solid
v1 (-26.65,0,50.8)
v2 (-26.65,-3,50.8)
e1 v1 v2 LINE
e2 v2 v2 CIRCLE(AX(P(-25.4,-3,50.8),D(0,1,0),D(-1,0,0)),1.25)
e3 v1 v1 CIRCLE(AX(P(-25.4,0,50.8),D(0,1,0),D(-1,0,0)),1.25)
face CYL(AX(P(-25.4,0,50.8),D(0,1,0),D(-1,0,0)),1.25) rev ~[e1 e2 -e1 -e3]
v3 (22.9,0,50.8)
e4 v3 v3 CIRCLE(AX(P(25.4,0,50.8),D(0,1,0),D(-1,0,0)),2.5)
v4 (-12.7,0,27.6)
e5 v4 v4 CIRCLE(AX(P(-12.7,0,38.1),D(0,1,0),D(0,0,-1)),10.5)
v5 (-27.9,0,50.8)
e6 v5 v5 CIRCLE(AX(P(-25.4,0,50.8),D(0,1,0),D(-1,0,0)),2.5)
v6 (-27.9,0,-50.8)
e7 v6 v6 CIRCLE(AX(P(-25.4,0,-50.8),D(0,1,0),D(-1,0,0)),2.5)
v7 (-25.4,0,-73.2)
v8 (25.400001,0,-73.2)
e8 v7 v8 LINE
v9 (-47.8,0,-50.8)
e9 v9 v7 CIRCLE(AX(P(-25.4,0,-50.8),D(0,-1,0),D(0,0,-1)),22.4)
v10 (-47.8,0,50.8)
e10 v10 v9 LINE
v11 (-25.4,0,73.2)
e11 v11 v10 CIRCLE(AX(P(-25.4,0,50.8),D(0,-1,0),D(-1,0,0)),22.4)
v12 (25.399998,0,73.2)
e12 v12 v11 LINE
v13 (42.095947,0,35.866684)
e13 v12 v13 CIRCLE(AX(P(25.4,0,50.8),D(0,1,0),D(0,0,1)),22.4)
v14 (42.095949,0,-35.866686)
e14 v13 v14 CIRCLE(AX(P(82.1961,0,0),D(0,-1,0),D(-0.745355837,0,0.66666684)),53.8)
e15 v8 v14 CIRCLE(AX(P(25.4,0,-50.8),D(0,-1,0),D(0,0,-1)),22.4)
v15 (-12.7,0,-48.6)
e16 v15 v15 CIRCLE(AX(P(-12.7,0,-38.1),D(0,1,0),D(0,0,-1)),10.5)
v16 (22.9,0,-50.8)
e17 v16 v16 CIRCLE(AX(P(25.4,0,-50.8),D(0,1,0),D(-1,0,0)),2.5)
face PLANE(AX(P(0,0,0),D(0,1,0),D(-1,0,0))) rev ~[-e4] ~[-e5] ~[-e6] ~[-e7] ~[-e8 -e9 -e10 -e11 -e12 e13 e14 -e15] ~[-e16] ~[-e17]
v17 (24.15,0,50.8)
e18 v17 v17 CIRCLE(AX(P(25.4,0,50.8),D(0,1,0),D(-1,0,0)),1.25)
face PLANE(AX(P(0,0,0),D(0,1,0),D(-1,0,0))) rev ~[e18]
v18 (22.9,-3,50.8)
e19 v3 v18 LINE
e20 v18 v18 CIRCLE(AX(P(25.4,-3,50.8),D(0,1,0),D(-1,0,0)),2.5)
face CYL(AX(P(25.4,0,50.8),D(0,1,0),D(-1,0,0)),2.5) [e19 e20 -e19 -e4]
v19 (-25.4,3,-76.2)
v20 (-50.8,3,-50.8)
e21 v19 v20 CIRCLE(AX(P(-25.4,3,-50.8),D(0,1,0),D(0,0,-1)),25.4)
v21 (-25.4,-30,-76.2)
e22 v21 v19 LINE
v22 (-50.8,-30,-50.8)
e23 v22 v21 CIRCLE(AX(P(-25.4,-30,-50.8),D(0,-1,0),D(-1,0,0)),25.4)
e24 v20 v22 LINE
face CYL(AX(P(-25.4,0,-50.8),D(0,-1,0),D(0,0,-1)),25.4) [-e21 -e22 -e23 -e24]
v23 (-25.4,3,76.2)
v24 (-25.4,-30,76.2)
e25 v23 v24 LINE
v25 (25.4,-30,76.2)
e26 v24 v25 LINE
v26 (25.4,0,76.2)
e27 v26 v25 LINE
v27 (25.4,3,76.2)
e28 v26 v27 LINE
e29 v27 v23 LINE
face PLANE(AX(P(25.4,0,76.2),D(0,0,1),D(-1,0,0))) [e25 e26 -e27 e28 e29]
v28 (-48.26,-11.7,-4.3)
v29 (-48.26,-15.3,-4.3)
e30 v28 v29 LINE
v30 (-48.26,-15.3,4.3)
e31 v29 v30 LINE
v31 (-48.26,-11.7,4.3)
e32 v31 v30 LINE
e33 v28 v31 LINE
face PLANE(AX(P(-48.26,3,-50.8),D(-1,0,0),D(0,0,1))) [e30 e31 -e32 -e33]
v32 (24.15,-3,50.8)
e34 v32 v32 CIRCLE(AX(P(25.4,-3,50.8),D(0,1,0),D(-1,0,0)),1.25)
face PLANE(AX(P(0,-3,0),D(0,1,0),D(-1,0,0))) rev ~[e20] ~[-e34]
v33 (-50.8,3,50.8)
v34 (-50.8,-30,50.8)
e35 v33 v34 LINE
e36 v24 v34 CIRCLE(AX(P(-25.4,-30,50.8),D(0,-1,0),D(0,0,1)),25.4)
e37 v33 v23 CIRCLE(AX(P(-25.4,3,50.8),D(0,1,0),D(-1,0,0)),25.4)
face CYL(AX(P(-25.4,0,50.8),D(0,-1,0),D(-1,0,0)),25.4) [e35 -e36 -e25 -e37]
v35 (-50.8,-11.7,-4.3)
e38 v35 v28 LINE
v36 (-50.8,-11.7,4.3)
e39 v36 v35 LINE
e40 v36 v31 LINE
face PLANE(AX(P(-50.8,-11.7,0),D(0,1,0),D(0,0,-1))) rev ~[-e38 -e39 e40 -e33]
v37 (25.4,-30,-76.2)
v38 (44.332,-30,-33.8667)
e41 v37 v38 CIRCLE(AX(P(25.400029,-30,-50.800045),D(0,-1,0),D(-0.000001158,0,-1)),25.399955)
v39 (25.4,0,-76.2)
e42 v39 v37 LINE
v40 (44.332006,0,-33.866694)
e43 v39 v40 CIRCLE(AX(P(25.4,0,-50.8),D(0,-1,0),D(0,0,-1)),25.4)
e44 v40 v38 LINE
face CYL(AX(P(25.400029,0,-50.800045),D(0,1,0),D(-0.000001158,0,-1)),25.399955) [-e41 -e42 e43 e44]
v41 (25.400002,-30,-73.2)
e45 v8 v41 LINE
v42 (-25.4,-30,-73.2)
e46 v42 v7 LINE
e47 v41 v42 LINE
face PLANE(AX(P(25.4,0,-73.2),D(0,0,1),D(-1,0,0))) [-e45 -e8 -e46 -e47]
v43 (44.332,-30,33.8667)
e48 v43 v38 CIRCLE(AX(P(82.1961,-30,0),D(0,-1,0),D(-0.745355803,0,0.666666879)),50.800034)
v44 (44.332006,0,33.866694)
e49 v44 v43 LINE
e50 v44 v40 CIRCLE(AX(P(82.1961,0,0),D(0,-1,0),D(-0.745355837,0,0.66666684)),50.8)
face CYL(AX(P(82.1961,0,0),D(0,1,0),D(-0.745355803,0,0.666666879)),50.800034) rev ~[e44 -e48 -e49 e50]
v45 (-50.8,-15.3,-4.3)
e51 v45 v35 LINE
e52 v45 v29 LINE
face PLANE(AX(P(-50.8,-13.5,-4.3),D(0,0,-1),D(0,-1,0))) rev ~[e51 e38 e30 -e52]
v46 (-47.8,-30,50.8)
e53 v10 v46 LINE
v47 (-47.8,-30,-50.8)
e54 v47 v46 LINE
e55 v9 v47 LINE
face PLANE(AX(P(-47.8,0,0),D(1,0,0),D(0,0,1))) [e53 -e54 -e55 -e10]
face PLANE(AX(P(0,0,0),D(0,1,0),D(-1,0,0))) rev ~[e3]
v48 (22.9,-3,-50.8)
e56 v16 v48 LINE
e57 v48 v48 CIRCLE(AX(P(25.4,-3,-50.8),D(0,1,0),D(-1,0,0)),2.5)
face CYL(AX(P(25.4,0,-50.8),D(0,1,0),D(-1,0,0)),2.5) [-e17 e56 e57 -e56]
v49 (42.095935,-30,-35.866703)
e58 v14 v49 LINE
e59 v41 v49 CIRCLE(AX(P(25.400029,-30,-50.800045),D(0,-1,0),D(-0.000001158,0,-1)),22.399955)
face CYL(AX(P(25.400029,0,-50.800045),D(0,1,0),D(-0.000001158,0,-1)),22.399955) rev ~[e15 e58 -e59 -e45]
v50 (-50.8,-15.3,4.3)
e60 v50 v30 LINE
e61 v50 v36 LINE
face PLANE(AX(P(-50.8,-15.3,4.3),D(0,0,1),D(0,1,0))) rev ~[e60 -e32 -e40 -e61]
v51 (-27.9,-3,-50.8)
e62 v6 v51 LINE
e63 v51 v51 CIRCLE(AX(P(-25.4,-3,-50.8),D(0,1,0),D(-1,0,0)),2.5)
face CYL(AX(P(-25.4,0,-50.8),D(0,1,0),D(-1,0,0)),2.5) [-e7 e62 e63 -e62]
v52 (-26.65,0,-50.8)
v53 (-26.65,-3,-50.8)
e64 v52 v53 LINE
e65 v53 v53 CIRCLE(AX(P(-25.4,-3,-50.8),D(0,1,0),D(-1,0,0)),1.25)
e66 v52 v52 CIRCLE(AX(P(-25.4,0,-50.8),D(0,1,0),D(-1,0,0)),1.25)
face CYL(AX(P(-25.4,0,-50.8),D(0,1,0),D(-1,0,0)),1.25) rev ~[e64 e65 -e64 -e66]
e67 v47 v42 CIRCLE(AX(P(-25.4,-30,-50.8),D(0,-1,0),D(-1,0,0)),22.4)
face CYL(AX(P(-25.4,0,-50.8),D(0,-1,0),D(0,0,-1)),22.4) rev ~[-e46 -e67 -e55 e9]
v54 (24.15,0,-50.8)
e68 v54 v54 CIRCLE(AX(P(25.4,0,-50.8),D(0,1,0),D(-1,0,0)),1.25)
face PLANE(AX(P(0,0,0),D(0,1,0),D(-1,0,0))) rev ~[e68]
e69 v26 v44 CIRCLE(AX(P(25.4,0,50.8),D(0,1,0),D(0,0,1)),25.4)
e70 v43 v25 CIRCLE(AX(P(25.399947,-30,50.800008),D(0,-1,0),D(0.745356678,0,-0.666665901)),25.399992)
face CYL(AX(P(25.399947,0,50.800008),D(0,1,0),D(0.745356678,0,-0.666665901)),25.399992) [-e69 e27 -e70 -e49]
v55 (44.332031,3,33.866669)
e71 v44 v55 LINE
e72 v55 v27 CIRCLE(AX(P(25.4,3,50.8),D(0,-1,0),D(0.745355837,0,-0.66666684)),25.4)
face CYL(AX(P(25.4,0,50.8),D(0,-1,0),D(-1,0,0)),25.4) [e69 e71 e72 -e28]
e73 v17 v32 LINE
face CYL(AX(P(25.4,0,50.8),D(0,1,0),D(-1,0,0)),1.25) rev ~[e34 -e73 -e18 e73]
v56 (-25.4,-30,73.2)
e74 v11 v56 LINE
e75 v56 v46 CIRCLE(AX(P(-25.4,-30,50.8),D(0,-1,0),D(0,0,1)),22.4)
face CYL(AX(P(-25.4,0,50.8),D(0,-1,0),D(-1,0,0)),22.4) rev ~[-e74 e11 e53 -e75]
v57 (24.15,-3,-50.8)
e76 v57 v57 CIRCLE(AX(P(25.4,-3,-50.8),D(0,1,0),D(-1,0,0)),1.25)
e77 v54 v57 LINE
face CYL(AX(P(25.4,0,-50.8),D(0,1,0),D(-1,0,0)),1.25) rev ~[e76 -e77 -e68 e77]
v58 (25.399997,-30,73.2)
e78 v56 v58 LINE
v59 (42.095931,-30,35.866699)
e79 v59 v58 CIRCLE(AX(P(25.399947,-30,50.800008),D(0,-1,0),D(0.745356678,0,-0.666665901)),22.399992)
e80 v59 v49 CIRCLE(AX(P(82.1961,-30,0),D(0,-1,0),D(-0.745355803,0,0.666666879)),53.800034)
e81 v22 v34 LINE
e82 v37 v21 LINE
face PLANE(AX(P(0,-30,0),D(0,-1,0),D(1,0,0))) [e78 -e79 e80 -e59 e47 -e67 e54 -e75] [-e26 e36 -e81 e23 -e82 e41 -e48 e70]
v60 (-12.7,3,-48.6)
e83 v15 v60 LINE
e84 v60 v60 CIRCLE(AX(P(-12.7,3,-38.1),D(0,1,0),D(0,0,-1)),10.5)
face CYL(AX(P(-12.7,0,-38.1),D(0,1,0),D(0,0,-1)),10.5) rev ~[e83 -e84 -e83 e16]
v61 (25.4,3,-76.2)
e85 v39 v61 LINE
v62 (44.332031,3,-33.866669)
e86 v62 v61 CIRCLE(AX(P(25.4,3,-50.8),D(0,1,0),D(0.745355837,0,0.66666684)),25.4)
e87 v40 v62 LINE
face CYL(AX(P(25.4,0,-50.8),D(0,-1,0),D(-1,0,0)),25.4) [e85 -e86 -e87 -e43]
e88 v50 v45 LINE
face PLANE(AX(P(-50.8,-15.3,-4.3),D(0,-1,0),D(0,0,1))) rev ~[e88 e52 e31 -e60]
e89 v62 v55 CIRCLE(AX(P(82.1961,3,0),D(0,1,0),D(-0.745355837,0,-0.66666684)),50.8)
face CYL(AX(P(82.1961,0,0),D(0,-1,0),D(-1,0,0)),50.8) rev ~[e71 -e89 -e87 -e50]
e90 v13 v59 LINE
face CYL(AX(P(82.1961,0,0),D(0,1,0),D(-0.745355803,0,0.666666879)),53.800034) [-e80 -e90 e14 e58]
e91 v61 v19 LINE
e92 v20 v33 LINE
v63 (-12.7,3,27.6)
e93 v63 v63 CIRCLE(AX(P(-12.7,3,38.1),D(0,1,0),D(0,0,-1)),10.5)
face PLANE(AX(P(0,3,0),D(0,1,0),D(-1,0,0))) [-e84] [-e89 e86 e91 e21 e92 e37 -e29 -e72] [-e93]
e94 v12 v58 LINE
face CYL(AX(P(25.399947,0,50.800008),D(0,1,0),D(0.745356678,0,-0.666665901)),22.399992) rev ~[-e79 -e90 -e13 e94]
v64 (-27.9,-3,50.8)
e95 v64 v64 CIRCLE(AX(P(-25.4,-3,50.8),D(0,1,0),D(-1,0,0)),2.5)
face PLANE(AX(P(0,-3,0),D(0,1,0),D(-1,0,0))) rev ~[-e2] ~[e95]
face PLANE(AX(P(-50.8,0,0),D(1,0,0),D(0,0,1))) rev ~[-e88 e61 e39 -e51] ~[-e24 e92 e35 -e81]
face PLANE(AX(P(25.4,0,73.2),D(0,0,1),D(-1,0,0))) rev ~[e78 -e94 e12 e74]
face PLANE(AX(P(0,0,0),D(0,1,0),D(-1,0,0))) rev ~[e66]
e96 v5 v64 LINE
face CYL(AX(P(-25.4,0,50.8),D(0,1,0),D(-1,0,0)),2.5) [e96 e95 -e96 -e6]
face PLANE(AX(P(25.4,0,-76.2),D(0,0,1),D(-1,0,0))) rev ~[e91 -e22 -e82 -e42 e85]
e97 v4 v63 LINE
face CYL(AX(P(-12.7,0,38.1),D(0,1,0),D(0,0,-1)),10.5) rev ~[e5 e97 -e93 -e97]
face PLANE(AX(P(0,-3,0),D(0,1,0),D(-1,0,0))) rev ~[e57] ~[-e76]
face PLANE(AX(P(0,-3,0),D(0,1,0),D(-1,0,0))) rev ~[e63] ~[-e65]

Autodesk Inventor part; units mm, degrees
ref_plane "YZ Plane" through (0, 0, 0) normal (1, 0, 0) x (0, 1, 0)
ref_plane "XZ Plane" through (0, 0, 0) normal (0, 1, 0) x (-1, 0, 0)
ref_plane "XY Plane" through (0, 0, 0) normal (0, 0, 1) x (1, 0, 0)
sketch "Sketch1" plane through (0, 0, 0) normal (0, 1, 0) x (-1, 0, 0)
  line L0 (-25.4, 76.2) -> (25.4, 76.2)
  line L1 (50.8, 76.2) -> (-50.8, 76.2)
  line L2 (-50.8, 50.8) -> (-50.8, -50.8)
  line L3 (50.8, 76.2) -> (-50.8, 76.2)
  line L4 (-25.4, -76.2) -> (25.4, -76.2)
  line L5 (50.8, -50.8) -> (50.8, 50.8)
  arc A0 (50.8, 50.8) -> (25.4, 76.2) centre (25.4, 50.8) ccw
  arc A1 (25.4, -76.2) -> (50.8, -50.8) centre (25.4, -50.8) ccw
  arc A2 (-50.8, -50.8) -> (-25.4, -76.2) centre (-25.4, -50.8) ccw
  arc A3 (-25.4, 76.2) -> (-50.8, 50.8) centre (-25.4, 50.8) ccw
  circle A4 centre (-25.4, 50.8) radius 25.4
  circle A5 centre (-25.4, -50.8) radius 25.4
  circle A6 centre (-50.8, 0) radius 31.3961
  circle A7 centre (-82.1961, 0) radius 50.8
  circle A8 centre (25.4, -50.8) radius 2.5
  circle A9 centre (25.4, -50.8) radius 1.25
  circle A10 centre (25.4, 50.8) radius 2.5
  circle A11 centre (25.4, 50.8) radius 1.25
  circle A12 centre (-25.4, 50.8) radius 2.5
  circle A13 centre (-25.4, 50.8) radius 1.25
  circle A14 centre (-25.4, -50.8) radius 2.5
  circle A15 centre (-25.4, -50.8) radius 1.25
  line L6 (-31.3961, 0) -> (50.8, 0)
  point P0 (-36.7592, 28.0815)
  point P1 (-36.7592, -28.0815)
  point P2 (12.7, 38.1)
  point P3 (12.7, -38.1)
  point P4 (-50.8, -31.3961)
  point P5 (-50.8, 31.3961)
  point P6 (-44.332, -33.8667)
  point P7 (-44.332, 33.8667)
  point P8 (9.7019, 0)
  point P9 (0.3879, -59.1619)
  point P10 (-13.7063, -28.2519)
  dimension "d6" = 101.6
  dimension "d21" = 25.4
  dimension "d68" = 2.5
  dimension "d69" = 2.5
  dimension "d70" = 2.5
  dimension "d71" = 2.5
  dimension "d72" = 5
  dimension "d73" = 5
  dimension "d74" = 5
  dimension "d75" = 5
extrude "Extrusion4" add sketch "Sketch1" along normal blind 3 contours A4 A3 | L0 A0 L5 L6 A6 A4 | A4 A6 A7 | A6 L6 A7 | L5 A1 L4 A5 A6 L6 | A6 A7 L6 | A5 A2 | A7 A6 A5 | A8 | A9 | A10 | A11 | A12 | A13 | A14 | A15
hole "Hole3" at (-12.7, 0, 38.1) at (-12.7, 0, -38.1) direction (0, 1, 0) diameter 21 depth 25.4 tip angle 118
sketch "Sketch5" plane through (0, 0, 0) normal (0, -1, 0) x (1, 0, 0)
  arc A0 (36.7592, 28.0815) -> (36.7592, -28.0815) centre (50.8, 0) ccw projected
  arc A1 (36.7592, 28.0815) -> (36.7592, -28.0815) centre (50.8, 0) ccw
  arc A2 (44.332, 33.8667) -> (25.4, 76.2) centre (25.4, 50.8) ccw projected
  arc A3 (36.7592, 28.0815) -> (25.4, 76.2) centre (25.4, 50.8) ccw
  arc A4 (25.4, -76.2) -> (44.332, -33.8667) centre (25.4, -50.8) ccw projected
  arc A5 (25.4, -76.2) -> (36.7592, -28.0815) centre (25.4, -50.8) ccw
  arc A6 (-25.4, 76.2) -> (-50.8, 50.8) centre (-25.4, 50.8) ccw projected
  line L0 (-50.8, -50.8) -> (-50.8, 50.8) projected
  arc A7 (-25.4, 76.2) -> (-50.8, 50.8) centre (-25.4, 50.8) ccw
  arc A8 (-50.8, -50.8) -> (-25.4, -76.2) centre (-25.4, -50.8) ccw projected
  arc A9 (-50.8, -50.8) -> (-25.4, -76.2) centre (-25.4, -50.8) ccw
  line L1 (-25.4, 76.2) -> (25.4, 76.2) projected
  line L2 (25.4, 76.2) -> (-25.4, 76.2)
  line L3 (25.4, -76.2) -> (-25.4, -76.2) projected
  line L4 (25.4, -76.2) -> (-25.4, -76.2)
  line L5 (-50.8, 50.8) -> (-50.8, -50.8)
  arc A10 (44.332, 33.8667) -> (25.4, 76.2) centre (25.4, 50.8) ccw
  arc A11 (44.332, 33.8667) -> (44.332, -33.8667) centre (82.1961, 0) ccw projected
  arc A12 (44.332, 33.8667) -> (44.332, -33.8667) centre (82.1961, 0) ccw
  arc A13 (25.4, -76.2) -> (44.332, -33.8667) centre (25.4, -50.8) ccw
  arc A14 (-50.8, -50.8) -> (-25.4, -76.2) centre (-25.4, -50.8) ccw
  arc A15 (-25.4, 76.2) -> (-50.8, 50.8) centre (-25.4, 50.8) ccw projected
  arc A16 (-25.4, 76.2) -> (-50.8, 50.8) centre (-25.4, 50.8) ccw
  line L6 (-25.4, 76.2) -> (25.4, 76.2)
  line L7 (-50.8, 50.8) -> (-50.8, -50.8)
  line L8 (-25.4, -76.2) -> (25.4, -76.2)
  point P0 (0, 0)
  point P1 (-12.7, 38.1)
  point P2 (-12.7, -38.1)
extrude "Extrusion5" add sketch "Sketch5" along normal blind 30
shell "Shell1" thickness 3 removed faces 3 at (-23.4013, -30, 0) at (-13.5376, 0, 41.4983) at (-15.9531, 0, -34.6)
sketch "Sketch8" plane through (-50.8, 3, -50.8) normal (-1, 0, 0) x (0, 0, 1)
  line L0 (0, -33) -> (101.6, -33) projected
  line L1 (0, 0) -> (101.6, 0)
  line L2 (101.6, 0) -> (101.6, -33)
  line L3 (101.6, -33) -> (0, -33)
  line L4 (0, -33) -> (0, 0)
  line L5 (50.8, 0) -> (50.8, -33)
  line L6 (0, -16.5) -> (101.6, -16.5)
  line L7 (50.8, -16.5) -> (55.1, -16.5)
  line L8 (55.1, -16.5) -> (55.1, -14.7)
  line L9 (50.8, -16.5) -> (46.5, -16.5)
  line L10 (46.5, -16.5) -> (46.5, -18.3)
  line L11 (55.1, -14.7) -> (46.5, -14.7)
  line L12 (46.5, -14.7) -> (46.5, -18.3)
  line L13 (46.5, -18.3) -> (55.1, -18.3)
  line L14 (55.1, -18.3) -> (55.1, -14.7)
  point P0 (50.8, -3)
  dimension "d82" = 4.3
  dimension "d83" = 4.3
  dimension "d84" = 1.8
  dimension "d85" = 1.8
extrude "Extrusion8" cut sketch "Sketch8" against normal blind 2.54 contours L13 L10 L6 L5 | L5 L6 L14 L13 | L12 L11 L5 L6 | L5 L11 L8 L6
extrude "Extrusion9" add sketch "Sketch1" against normal blind 3 contours A8 | A10 | A12 | A14
equation "\"d69\" = d68"
equation "\"d70\" = d68"
equation "\"d71\" = d68"
equation "\"d73\" = d72"
equation "\"d74\" = d73"
equation "\"d75\" = d72"
equation "\"d83\" = d82"
equation "\"d85\" = d84"
properties part number "ControllerTop"
